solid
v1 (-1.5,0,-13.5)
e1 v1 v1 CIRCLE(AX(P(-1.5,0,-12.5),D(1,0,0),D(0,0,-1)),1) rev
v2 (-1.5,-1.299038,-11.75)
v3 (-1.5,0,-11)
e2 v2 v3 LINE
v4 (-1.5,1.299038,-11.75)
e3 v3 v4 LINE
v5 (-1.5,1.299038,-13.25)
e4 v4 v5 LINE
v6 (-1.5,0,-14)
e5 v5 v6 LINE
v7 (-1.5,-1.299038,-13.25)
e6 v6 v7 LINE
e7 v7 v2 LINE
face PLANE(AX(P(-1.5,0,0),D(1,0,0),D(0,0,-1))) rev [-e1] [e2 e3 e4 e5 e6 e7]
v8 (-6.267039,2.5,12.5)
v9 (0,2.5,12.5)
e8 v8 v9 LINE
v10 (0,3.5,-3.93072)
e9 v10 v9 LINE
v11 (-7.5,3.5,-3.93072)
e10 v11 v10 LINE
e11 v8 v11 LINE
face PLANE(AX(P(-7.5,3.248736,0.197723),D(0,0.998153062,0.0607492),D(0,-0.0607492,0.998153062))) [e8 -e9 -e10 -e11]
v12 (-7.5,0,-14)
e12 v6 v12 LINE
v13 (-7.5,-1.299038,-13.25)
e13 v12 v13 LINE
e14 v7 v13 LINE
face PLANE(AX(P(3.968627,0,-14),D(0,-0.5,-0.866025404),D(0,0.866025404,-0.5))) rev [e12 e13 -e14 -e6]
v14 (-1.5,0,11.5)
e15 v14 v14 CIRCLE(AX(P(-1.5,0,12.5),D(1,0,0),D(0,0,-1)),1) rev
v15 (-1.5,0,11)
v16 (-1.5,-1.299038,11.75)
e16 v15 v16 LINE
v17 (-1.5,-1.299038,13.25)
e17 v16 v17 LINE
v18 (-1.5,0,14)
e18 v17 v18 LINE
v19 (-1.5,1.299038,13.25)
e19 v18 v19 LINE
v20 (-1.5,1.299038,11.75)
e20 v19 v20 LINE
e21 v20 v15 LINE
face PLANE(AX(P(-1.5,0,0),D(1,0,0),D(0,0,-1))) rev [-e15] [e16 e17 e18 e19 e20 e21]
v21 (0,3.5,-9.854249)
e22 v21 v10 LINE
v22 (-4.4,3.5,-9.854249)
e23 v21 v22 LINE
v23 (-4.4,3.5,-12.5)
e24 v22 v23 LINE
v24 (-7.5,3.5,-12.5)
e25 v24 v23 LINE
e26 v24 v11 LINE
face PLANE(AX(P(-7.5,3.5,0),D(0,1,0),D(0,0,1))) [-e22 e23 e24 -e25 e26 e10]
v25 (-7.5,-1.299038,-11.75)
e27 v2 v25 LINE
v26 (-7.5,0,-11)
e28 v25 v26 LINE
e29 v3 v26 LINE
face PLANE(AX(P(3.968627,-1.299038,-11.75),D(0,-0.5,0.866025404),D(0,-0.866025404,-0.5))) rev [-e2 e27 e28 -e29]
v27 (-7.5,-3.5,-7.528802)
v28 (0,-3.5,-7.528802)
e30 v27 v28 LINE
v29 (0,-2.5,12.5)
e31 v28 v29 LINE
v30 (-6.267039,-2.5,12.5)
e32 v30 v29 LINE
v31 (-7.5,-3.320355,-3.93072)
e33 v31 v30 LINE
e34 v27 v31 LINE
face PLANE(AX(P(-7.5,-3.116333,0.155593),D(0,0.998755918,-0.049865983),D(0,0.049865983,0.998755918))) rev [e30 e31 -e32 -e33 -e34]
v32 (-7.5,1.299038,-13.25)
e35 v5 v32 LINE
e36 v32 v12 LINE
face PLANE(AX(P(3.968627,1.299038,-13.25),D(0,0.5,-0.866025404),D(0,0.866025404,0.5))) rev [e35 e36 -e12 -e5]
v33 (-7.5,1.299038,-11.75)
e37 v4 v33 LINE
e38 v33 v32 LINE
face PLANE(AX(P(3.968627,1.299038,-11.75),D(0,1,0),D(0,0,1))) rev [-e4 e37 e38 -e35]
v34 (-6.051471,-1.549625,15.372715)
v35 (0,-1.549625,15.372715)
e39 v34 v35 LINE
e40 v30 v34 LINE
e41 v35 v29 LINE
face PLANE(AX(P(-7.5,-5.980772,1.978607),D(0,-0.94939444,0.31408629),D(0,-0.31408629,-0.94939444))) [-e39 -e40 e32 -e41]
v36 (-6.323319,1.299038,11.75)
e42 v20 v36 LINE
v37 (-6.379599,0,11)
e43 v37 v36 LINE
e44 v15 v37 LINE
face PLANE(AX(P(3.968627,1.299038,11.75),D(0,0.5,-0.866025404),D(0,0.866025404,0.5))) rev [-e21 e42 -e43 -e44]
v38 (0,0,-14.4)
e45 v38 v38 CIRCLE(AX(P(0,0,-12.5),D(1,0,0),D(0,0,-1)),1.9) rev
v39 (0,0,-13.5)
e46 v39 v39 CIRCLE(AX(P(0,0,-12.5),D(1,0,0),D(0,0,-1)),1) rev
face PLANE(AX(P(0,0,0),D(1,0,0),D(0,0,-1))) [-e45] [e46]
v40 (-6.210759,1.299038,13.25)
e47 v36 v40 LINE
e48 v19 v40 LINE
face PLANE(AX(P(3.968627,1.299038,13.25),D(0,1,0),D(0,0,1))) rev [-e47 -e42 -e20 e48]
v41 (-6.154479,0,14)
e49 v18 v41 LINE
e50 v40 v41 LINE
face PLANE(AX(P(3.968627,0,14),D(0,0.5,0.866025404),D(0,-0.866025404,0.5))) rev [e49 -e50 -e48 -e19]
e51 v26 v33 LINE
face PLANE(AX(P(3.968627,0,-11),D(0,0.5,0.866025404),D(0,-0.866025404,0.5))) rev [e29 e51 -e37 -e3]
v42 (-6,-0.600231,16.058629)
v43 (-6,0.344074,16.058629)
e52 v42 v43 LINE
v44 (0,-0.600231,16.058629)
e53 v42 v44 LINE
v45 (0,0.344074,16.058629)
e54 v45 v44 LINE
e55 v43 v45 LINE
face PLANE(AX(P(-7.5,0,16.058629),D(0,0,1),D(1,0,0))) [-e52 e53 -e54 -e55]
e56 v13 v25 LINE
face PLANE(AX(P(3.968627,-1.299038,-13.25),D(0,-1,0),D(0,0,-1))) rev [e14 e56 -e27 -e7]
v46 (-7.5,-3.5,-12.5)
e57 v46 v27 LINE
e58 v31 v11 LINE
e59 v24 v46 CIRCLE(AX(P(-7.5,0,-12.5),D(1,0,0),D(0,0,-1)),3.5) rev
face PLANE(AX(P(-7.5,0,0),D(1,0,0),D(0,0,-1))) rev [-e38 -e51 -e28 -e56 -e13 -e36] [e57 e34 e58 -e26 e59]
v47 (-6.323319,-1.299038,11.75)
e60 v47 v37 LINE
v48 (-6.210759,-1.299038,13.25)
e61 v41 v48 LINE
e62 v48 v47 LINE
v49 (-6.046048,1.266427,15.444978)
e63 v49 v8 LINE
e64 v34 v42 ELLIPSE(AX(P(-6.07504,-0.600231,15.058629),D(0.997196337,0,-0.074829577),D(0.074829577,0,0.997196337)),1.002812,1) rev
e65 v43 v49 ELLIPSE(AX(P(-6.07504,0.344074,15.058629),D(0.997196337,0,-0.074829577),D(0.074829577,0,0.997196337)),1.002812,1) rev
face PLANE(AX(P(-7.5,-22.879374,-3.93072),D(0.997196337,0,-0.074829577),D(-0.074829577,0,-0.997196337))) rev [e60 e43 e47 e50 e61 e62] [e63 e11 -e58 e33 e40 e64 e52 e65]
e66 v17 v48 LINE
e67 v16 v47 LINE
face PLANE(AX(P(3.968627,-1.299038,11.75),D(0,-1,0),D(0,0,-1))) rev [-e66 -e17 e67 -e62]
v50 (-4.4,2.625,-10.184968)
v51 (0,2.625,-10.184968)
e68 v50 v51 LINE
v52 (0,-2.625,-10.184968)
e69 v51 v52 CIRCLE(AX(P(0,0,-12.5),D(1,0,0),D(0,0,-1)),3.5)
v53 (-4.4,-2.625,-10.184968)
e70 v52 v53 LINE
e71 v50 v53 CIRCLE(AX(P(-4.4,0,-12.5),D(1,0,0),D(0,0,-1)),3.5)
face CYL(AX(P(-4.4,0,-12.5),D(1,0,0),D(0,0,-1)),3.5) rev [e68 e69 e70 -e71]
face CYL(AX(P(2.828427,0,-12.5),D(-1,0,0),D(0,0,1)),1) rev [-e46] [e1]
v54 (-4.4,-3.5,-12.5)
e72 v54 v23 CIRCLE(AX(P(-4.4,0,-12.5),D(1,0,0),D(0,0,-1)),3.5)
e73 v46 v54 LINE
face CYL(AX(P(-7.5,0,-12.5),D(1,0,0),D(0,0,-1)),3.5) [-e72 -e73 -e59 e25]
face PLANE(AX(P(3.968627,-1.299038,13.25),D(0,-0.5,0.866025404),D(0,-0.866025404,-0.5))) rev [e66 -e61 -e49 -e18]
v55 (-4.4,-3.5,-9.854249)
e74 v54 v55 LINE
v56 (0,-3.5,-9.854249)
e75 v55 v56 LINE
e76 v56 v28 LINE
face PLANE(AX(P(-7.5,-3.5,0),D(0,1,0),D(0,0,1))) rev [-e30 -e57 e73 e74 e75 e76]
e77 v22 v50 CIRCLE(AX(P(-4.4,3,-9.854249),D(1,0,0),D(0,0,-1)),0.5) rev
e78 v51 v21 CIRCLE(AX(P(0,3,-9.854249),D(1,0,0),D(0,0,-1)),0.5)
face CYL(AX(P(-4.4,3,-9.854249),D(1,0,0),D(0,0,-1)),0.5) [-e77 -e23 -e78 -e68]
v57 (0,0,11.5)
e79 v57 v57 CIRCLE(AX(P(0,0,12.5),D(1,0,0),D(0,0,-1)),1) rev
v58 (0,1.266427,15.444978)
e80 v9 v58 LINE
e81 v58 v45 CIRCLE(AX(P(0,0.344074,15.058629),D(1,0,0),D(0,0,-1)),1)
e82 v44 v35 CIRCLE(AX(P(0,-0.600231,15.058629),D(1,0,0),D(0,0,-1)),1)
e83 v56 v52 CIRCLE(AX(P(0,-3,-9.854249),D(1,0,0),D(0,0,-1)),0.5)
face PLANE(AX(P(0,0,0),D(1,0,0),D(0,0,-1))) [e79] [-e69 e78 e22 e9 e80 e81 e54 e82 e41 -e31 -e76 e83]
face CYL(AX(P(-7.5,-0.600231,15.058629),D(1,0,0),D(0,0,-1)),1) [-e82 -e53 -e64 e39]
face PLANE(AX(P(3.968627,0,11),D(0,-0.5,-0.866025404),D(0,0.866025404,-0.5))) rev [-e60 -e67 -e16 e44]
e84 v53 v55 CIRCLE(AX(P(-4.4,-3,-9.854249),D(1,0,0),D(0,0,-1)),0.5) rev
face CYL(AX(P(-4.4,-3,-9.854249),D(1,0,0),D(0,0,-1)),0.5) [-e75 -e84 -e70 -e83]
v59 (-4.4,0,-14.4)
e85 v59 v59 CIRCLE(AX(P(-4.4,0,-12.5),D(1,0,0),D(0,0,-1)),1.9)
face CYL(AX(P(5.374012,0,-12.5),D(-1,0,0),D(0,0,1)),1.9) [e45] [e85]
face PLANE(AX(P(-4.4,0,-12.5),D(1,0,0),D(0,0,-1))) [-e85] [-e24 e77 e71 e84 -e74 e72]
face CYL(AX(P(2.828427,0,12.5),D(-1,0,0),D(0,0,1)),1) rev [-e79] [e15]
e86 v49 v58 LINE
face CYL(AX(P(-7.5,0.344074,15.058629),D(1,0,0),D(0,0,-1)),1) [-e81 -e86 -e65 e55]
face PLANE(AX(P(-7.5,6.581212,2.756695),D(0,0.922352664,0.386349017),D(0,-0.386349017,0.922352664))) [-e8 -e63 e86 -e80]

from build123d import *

# Parameters (mm, degrees)
BOSS_EXTRUDE1_DEPTH = 7.5
SKETCH2_R           = 3.5
CUT_EXTRUDE1_DEPTH  = 4.4
FILLET1_START       = -4.4
FILLET1_DEPTH       = 5.4
SKETCH3_R           = 1.9
BOSS_EXTRUDE2_DEPTH = 7.5
CUT_EXTRUDE2_REACH  = 21.056
SKETCH7_R           = 1
CUT_EXTRUDE3_DEPTH  = 7.5
CUT_EXTRUDE4_DEPTH  = 6


with BuildPart() as part:
    # Sketch1 → Boss-Extrude1 (new body)
    with BuildSketch(Plane(origin=(0, 0, 0), x_dir=(0, 0, -1), z_dir=(1, 0, 0))):
        with BuildLine():
            Line((12.5, -3.5), (7.528802268, -3.5))
            Line((7.528802268, -3.5), (-12.5, -2.5))
            Line((-12.5, -2.5), (-15.372715308, -1.549625261))
            ThreePointArc((-15.372715308, -1.549625261), (-15.869210997, -1.185856004), (-16.058629018, -0.600230821))
            Line((-16.058629018, -0.600230821), (-16.058629018, 0.344074306))
            ThreePointArc((-16.058629018, 0.344074306), (-15.891200042, 0.897992613), (-15.444978036, 1.26642697))
            Line((-15.444978036, 1.26642697), (-12.5, 2.5))
            Line((-12.5, 2.5), (3.930719529, 3.5))
            Line((3.930719529, 3.5), (12.5, 3.5))
            ThreePointArc((12.5, 3.5), (16, 0), (12.5, -3.5))
        make_face()
    extrude(amount=-BOSS_EXTRUDE1_DEPTH)

    # Sketch2 → Cut-Extrude1 (cut)
    with BuildSketch(Plane(origin=(0, 0, 0), x_dir=(0, 0, -1), z_dir=(1, 0, 0))):
        with Locations((12.5, 0)):
            Circle(SKETCH2_R)
    extrude(amount=-CUT_EXTRUDE1_DEPTH, mode=Mode.SUBTRACT)

    # Fillet1: read off the stored shape, not the designer's step
    # Fillet1 outline → Fillet1 (cut)
    with BuildSketch(Plane.YZ.offset(FILLET1_START)):
        with BuildLine():
            ThreePointArc((3.5, -9.854248689), (3.176776695, -10.321955862), (2.625, -10.184967603))
            ThreePointArc((2.625, -10.184967603), (3.273950213, -11.262563133), (3.5, -12.5))
            Line((3.5, -12.5), (3.5, -9.854248689))
        make_face()
        with BuildLine():
            ThreePointArc((-2.625, -10.184967603), (-3.176776695, -10.321955862), (-3.5, -9.854248689))
            Line((-3.5, -9.854248689), (-3.5, -12.5))
            ThreePointArc((-3.5, -12.5), (-3.273950213, -11.262563133), (-2.625, -10.184967603))
        make_face()
    extrude(amount=FILLET1_DEPTH, mode=Mode.SUBTRACT)

    # Sketch3 → Boss-Extrude2 (add)
    with BuildSketch(Plane.ZY.offset(7.5)):
        with Locations(Location((-12.5, 0, 0), (0, 0, 180))):
            Circle(SKETCH3_R)
    extrude(amount=-BOSS_EXTRUDE2_DEPTH)

    # Cut-Extrude2: up to this plane
    cut_extrude2_end = Plane(origin=(-7.5, -3.116332783, 0.155592568), z_dir=(0, 0.9987559179882337, -0.04986598322986022))
    # Sketch4 → Cut-Extrude2 (cut, up to the surface)
    with BuildSketch(Plane(origin=(0, 3.5, 0), x_dir=(1, 0, 0), z_dir=(0, 1, 0)), mode=Mode.PRIVATE) as cut_extrude2_sk1:
        Polygon((-7.5, -16.058629018), (-7.5, 3.930719529), (-6, -16.058629018), align=None)
    cut_extrude2_tool1 = split(extrude(cut_extrude2_sk1.sketch, amount=-CUT_EXTRUDE2_REACH, mode=Mode.PRIVATE), bisect_by=cut_extrude2_end, keep=Keep.BOTH, mode=Mode.PRIVATE)
    add(cut_extrude2_tool1.solids().sort_by_distance((-7, 3.5, 9.395513))[0], mode=Mode.SUBTRACT)

    # Sketch7 → Cut-Extrude3 (cut)
    with BuildSketch(Plane.ZY.offset(7.5)):
        with Locations((-12.5, 0)):
            Circle(SKETCH7_R)
        with Locations(Location((12.5, 0, 0), (0, 0, 180))):
            Circle(SKETCH7_R)
    extrude(amount=-CUT_EXTRUDE3_DEPTH, mode=Mode.SUBTRACT)

    # Sketch8 → Cut-Extrude4 (cut)
    with BuildSketch(Plane.ZY.offset(7.5)):
        Polygon((-11, 0), (-11.75, 1.299038106), (-13.25, 1.299038106), (-14, 0), (-13.25, -1.299038106), (-11.75, -1.299038106), align=None)
        Polygon((14, 0), (13.25, 1.299038106), (11.75, 1.299038106), (11, 0), (11.75, -1.299038106), (13.25, -1.299038106), align=None)
    extrude(amount=-CUT_EXTRUDE4_DEPTH, mode=Mode.SUBTRACT)


solid = part.part
